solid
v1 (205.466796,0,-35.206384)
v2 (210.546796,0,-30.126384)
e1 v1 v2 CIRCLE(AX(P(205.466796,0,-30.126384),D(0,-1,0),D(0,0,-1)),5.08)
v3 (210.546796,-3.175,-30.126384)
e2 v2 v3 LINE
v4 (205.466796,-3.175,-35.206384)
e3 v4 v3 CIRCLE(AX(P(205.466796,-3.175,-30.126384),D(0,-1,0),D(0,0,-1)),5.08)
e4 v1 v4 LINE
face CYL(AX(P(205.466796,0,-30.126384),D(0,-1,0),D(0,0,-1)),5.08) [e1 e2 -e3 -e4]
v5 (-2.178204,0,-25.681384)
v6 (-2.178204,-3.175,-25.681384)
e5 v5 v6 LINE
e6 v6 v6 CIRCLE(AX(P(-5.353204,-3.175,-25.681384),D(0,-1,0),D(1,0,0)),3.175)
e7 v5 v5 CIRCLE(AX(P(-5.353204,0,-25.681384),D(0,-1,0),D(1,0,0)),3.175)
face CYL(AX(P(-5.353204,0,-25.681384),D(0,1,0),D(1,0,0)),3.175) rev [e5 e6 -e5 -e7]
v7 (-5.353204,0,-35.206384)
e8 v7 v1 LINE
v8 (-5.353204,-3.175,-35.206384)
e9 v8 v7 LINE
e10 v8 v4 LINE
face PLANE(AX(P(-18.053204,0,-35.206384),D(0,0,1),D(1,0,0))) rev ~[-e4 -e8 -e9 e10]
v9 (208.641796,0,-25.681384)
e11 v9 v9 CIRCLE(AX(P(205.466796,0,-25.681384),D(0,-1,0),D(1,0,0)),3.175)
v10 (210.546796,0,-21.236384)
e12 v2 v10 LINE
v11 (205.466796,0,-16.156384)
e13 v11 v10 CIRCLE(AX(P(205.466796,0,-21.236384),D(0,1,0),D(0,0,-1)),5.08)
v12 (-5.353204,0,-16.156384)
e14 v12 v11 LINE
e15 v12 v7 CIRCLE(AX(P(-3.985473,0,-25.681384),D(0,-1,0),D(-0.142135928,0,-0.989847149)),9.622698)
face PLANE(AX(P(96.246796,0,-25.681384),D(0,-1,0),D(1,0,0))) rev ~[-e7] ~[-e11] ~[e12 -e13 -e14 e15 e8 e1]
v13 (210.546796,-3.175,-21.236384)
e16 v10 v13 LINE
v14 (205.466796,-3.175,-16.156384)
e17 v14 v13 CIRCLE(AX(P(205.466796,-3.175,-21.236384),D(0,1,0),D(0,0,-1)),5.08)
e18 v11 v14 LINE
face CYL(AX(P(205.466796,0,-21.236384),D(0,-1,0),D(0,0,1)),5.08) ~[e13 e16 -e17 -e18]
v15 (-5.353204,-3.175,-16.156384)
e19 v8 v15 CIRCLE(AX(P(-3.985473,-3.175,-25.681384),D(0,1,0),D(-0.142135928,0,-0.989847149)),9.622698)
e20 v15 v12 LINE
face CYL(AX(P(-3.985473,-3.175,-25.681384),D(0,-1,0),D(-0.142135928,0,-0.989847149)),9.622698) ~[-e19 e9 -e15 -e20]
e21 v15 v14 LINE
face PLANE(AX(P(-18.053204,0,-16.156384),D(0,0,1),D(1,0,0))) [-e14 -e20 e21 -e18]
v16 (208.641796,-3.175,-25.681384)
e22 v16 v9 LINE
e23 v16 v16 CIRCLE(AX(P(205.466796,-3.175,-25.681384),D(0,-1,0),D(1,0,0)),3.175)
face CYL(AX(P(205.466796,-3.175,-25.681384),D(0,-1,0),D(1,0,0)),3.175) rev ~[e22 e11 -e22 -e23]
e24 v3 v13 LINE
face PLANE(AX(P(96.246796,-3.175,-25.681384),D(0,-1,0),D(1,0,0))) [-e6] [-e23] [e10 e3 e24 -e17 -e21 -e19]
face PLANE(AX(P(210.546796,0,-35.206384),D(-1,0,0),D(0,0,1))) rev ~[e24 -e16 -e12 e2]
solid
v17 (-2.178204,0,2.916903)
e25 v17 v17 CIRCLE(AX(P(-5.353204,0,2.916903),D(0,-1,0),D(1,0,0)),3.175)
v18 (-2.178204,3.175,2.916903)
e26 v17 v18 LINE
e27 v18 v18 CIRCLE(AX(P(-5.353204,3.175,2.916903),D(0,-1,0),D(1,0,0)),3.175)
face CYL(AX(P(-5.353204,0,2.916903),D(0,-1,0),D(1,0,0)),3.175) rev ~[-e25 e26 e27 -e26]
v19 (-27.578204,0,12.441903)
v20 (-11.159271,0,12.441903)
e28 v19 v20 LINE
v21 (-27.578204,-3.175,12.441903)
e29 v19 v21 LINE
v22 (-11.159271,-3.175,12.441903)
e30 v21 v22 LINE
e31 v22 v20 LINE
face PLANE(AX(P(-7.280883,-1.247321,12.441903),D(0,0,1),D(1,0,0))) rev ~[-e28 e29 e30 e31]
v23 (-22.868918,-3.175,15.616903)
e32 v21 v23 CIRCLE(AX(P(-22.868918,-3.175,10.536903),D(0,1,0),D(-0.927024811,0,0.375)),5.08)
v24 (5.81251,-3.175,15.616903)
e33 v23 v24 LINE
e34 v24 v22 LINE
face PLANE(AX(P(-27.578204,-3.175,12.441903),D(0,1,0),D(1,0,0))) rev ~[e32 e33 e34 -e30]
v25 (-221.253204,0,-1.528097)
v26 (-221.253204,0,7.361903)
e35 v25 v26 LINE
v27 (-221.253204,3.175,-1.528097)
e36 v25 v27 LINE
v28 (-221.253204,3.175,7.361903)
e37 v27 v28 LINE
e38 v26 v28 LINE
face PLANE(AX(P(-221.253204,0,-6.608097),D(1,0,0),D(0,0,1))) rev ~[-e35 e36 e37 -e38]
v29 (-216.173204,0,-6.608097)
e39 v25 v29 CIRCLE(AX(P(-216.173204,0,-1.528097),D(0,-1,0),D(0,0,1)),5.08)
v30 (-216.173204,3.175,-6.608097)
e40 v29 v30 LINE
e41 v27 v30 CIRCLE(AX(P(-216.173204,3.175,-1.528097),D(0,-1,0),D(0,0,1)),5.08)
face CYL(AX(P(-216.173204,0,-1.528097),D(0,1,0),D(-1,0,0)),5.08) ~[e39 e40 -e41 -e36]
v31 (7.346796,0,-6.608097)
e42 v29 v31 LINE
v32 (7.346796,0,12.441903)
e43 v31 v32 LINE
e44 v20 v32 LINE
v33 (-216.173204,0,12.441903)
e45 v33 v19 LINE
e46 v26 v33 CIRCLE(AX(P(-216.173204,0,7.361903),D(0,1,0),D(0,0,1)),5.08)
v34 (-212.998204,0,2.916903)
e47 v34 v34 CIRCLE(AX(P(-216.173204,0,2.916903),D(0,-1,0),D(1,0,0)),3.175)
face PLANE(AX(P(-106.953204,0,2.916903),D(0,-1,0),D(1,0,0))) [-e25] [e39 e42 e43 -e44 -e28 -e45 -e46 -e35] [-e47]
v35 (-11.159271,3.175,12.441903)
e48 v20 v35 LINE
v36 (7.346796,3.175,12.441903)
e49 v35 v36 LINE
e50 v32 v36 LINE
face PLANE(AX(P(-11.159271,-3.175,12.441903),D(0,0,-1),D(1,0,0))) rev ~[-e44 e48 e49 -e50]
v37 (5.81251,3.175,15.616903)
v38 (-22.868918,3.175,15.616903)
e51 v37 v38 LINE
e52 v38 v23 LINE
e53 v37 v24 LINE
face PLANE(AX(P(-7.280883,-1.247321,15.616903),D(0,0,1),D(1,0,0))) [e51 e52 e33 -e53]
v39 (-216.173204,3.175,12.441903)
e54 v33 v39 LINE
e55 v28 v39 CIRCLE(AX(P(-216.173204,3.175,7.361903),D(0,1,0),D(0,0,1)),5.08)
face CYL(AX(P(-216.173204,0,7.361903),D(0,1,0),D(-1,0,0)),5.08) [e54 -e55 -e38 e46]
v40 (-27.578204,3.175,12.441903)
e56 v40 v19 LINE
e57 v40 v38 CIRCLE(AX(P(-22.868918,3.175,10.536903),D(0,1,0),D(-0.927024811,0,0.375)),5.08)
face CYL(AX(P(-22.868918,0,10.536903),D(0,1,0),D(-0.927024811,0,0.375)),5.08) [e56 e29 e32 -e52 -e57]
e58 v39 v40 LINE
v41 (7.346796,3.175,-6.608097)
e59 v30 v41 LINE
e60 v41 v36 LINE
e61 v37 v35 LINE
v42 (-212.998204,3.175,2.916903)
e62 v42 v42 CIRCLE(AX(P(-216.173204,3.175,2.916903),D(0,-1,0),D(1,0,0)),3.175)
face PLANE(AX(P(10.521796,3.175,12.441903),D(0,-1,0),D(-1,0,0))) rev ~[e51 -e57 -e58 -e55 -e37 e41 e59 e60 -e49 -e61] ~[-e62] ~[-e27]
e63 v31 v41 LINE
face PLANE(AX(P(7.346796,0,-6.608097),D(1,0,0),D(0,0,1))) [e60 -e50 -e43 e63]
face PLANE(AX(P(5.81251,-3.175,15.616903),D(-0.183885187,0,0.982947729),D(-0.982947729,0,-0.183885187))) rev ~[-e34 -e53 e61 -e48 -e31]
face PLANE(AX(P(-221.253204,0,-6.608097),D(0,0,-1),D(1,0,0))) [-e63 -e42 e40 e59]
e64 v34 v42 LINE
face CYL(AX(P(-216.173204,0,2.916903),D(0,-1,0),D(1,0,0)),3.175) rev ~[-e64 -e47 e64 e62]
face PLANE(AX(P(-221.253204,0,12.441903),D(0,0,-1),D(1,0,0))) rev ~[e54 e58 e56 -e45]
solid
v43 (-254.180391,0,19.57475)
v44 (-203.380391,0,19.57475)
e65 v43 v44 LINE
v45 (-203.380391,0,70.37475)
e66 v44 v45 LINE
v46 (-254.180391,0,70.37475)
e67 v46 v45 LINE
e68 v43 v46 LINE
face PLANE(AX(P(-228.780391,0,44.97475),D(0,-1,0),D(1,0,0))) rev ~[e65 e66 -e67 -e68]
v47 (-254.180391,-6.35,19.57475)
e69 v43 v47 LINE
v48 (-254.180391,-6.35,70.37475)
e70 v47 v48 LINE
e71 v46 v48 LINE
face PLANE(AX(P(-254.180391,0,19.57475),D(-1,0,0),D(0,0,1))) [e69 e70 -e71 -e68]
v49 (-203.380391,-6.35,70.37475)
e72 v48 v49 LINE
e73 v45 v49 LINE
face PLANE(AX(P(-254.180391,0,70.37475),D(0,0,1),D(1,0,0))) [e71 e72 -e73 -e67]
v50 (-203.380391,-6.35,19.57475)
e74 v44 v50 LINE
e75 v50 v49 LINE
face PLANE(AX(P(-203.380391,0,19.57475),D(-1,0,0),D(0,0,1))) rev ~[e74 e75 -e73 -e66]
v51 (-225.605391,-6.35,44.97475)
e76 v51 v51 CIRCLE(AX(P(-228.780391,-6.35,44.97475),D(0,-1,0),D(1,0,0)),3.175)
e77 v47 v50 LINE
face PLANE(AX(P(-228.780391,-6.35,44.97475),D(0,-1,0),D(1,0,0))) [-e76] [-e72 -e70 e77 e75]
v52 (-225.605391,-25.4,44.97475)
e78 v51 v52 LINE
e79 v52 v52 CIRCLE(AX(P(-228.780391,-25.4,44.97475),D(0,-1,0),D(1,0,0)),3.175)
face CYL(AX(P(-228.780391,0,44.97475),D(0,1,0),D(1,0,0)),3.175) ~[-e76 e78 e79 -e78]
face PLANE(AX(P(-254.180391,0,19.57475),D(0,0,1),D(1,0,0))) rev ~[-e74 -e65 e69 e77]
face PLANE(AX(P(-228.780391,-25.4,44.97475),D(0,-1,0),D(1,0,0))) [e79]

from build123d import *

# Parameters (mm, degrees)
F0_W        = 228.6
F0_H        = 19.05
F0_R        = 3.175
F1_DEPTH    = 3.175
F2_DEPTH    = 3.175
F3_R        = 5.08
F4_R        = 5.08
F5_W        = 34.925
F5_H        = 3.175
F6_DEPTH    = 3.175
F7_T1_DEPTH = 14.9482151929
F7_T3_DEPTH = 14.9482150036
F7_T5_DEPTH = 29.8964301965
F9_DEPTH    = 25.4
F11_DEPTH   = 25.4
F12_R       = 3.175
F13_DEPTH   = 3.176
F14_R       = 3.175
F15_DEPTH   = 6.351
F16_W       = 50.8
F16_H       = 50.8
F16_R       = 3.175
F17_DEPTH   = 6.35
F18_DEPTH   = 25.4


# Not quite as in the source:
# - a fillet or chamfer that OpenCascade refuses, or shapes differently, is made with other operations: its cross-section is extruded or revolved along the edge and cut away or added


with BuildPart() as f1:
    # F0 (on Front) → F1 (new body)
    with BuildSketch(Plane.XZ):
        with Locations((-106.9532044351, 2.9169026516)):
            Rectangle(F0_W, F0_H)
        with Locations((-5.3532044351, 2.9169026516)):
            Circle(F0_R, mode=Mode.SUBTRACT)
    extrude(amount=-F1_DEPTH)

    # F3
    f3_edges = [f1.edges().sort_by_distance(p)[0] for p in [
        (-221.253204, 1.5875, 12.441903),
        (-221.253204, 1.5875, -6.608097),
    ]]
    fillet(f3_edges, radius=F3_R)

    # F5 (on face) → F6 (join)
    with BuildSketch(Plane.XY.offset(12.4419026516)):
        Polygon((10.5217955649, -3.175), (10.5217955649, 3.175), (7.3467955649, 3.175), (7.3467955649, 0), (-27.5782044351, 0), (-27.5782044351, -3.175), align=None)
        with Locations((-10.1157044351, 1.5875)):
            Rectangle(F5_W, F5_H)
    extrude(amount=F6_DEPTH)

    # F7: fillet of radius 5.08 on 2 edges, made by hand

    # F7_s2 → F7_t1 (cut)
    with BuildSketch(Plane.XZ.offset(-14.9482150983)):
        with BuildLine():
            ThreePointArc((-27.5782044351, 12.4419026516), (-25.7087247272, 14.7490161354), (-22.8689183958, 15.6169026516))
            Line((-22.8689183958, 15.6169026516), (-27.5782044351, 15.6169026516))
            Line((-27.5782044351, 15.6169026516), (-27.5782044351, 12.4419026516))
        make_face()
    extrude(amount=F7_T1_DEPTH, mode=Mode.SUBTRACT)

    # F7_s4 → F7_t3 (cut)
    with BuildSketch(Plane.XZ.offset(9.46e-08)):
        with BuildLine():
            ThreePointArc((-27.5782044351, 12.4419026516), (-25.7087247272, 14.7490161354), (-22.8689183958, 15.6169026516))
            Line((-22.8689183958, 15.6169026516), (-27.5782044351, 15.6169026516))
            Line((-27.5782044351, 15.6169026516), (-27.5782044351, 12.4419026516))
        make_face()
    extrude(amount=F7_T3_DEPTH, mode=Mode.SUBTRACT)

    # F7_s6 → F7_t5 (cut)
    with BuildSketch(Plane.XZ.offset(-14.9482150983)):
        with BuildLine():
            ThreePointArc((5.8125095256, 15.6169026516), (8.652315857, 14.7490161354), (10.5217955649, 12.4419026516))
            Line((10.5217955649, 12.4419026516), (10.5217955649, 15.6169026516))
            Line((10.5217955649, 15.6169026516), (5.8125095256, 15.6169026516))
        make_face()
    extrude(amount=F7_T5_DEPTH, mode=Mode.SUBTRACT)

    # F8 (on face) → F9 (cut)
    with BuildSketch(Plane.XZ.offset(3.175)):
        with BuildLine():
            Line((5.8125095256, 15.6169026516), (-11.1592710018, 12.4419026516))
            Line((-11.1592710018, 12.4419026516), (10.5217955649, 12.4419026516))
            ThreePointArc((10.5217955649, 12.4419026516), (8.652315857, 14.7490161354), (5.8125095256, 15.6169026516))
        make_face()
    extrude(amount=-F9_DEPTH, mode=Mode.SUBTRACT)

    # F12 (on face) → F13 (cut, through all)
    with BuildSketch(Plane.XZ):
        with Locations((-216.1732044351, 2.9169026516)):
            Circle(F12_R)
    extrude(amount=-F13_DEPTH, mode=Mode.SUBTRACT)


with BuildPart() as f2:
    # F0 (on Front) → F2 (new body)
    with BuildSketch(Plane.XZ):
        with Locations((96.2467955649, -25.6813844749)):
            Rectangle(F0_W, F0_H)
        with Locations((-5.3532044351, -25.6813844749)):
            Circle(F0_R, mode=Mode.SUBTRACT)
    extrude(amount=F2_DEPTH)

    # F4
    f4_edges = [f2.edges().sort_by_distance(p)[0] for p in [
        (210.546796, -1.5875, -16.156384),
        (210.546796, -1.5875, -35.206384),
    ]]
    fillet(f4_edges, radius=F4_R)

    # F10 (on face) → F11 (cut)
    with BuildSketch(Plane.XZ.offset(3.175)):
        with BuildLine():
            ThreePointArc((-5.3532044351, -35.2063844749), (-13.6081711663, -25.6813844749), (-5.3532044351, -16.1563844749))
            Line((-5.3532044351, -16.1563844749), (-18.0532044351, -16.1563844749))
            Line((-18.0532044351, -16.1563844749), (-18.0532044351, -35.2063844749))
            Line((-18.0532044351, -35.2063844749), (-5.3532044351, -35.2063844749))
        make_face()
    extrude(amount=-F11_DEPTH, mode=Mode.SUBTRACT)

    # F14 (on face) → F15 (cut, through all)
    with BuildSketch(Plane.XZ.offset(3.175)):
        with Locations((205.4667955649, -25.6813844749)):
            Circle(F14_R)
    extrude(amount=-F15_DEPTH, mode=Mode.SUBTRACT)


with BuildPart() as f17:
    # F16 (on Front) → F17 (new body)
    with BuildSketch(Plane.XZ):
        with Locations((-228.7803910017, 44.9747502148)):
            Rectangle(F16_W, F16_H)
        with Locations((-228.7803910017, 44.9747502148)):
            Circle(F16_R, mode=Mode.SUBTRACT)
    extrude(amount=F17_DEPTH)

    # F16 (on Front) → F18 (join)
    with BuildSketch(Plane.XZ):
        with Locations((-228.7803910017, 44.9747502148)):
            Circle(F16_R)
    extrude(amount=F18_DEPTH)


solid = Compound([f1.part, f2.part, f17.part])
